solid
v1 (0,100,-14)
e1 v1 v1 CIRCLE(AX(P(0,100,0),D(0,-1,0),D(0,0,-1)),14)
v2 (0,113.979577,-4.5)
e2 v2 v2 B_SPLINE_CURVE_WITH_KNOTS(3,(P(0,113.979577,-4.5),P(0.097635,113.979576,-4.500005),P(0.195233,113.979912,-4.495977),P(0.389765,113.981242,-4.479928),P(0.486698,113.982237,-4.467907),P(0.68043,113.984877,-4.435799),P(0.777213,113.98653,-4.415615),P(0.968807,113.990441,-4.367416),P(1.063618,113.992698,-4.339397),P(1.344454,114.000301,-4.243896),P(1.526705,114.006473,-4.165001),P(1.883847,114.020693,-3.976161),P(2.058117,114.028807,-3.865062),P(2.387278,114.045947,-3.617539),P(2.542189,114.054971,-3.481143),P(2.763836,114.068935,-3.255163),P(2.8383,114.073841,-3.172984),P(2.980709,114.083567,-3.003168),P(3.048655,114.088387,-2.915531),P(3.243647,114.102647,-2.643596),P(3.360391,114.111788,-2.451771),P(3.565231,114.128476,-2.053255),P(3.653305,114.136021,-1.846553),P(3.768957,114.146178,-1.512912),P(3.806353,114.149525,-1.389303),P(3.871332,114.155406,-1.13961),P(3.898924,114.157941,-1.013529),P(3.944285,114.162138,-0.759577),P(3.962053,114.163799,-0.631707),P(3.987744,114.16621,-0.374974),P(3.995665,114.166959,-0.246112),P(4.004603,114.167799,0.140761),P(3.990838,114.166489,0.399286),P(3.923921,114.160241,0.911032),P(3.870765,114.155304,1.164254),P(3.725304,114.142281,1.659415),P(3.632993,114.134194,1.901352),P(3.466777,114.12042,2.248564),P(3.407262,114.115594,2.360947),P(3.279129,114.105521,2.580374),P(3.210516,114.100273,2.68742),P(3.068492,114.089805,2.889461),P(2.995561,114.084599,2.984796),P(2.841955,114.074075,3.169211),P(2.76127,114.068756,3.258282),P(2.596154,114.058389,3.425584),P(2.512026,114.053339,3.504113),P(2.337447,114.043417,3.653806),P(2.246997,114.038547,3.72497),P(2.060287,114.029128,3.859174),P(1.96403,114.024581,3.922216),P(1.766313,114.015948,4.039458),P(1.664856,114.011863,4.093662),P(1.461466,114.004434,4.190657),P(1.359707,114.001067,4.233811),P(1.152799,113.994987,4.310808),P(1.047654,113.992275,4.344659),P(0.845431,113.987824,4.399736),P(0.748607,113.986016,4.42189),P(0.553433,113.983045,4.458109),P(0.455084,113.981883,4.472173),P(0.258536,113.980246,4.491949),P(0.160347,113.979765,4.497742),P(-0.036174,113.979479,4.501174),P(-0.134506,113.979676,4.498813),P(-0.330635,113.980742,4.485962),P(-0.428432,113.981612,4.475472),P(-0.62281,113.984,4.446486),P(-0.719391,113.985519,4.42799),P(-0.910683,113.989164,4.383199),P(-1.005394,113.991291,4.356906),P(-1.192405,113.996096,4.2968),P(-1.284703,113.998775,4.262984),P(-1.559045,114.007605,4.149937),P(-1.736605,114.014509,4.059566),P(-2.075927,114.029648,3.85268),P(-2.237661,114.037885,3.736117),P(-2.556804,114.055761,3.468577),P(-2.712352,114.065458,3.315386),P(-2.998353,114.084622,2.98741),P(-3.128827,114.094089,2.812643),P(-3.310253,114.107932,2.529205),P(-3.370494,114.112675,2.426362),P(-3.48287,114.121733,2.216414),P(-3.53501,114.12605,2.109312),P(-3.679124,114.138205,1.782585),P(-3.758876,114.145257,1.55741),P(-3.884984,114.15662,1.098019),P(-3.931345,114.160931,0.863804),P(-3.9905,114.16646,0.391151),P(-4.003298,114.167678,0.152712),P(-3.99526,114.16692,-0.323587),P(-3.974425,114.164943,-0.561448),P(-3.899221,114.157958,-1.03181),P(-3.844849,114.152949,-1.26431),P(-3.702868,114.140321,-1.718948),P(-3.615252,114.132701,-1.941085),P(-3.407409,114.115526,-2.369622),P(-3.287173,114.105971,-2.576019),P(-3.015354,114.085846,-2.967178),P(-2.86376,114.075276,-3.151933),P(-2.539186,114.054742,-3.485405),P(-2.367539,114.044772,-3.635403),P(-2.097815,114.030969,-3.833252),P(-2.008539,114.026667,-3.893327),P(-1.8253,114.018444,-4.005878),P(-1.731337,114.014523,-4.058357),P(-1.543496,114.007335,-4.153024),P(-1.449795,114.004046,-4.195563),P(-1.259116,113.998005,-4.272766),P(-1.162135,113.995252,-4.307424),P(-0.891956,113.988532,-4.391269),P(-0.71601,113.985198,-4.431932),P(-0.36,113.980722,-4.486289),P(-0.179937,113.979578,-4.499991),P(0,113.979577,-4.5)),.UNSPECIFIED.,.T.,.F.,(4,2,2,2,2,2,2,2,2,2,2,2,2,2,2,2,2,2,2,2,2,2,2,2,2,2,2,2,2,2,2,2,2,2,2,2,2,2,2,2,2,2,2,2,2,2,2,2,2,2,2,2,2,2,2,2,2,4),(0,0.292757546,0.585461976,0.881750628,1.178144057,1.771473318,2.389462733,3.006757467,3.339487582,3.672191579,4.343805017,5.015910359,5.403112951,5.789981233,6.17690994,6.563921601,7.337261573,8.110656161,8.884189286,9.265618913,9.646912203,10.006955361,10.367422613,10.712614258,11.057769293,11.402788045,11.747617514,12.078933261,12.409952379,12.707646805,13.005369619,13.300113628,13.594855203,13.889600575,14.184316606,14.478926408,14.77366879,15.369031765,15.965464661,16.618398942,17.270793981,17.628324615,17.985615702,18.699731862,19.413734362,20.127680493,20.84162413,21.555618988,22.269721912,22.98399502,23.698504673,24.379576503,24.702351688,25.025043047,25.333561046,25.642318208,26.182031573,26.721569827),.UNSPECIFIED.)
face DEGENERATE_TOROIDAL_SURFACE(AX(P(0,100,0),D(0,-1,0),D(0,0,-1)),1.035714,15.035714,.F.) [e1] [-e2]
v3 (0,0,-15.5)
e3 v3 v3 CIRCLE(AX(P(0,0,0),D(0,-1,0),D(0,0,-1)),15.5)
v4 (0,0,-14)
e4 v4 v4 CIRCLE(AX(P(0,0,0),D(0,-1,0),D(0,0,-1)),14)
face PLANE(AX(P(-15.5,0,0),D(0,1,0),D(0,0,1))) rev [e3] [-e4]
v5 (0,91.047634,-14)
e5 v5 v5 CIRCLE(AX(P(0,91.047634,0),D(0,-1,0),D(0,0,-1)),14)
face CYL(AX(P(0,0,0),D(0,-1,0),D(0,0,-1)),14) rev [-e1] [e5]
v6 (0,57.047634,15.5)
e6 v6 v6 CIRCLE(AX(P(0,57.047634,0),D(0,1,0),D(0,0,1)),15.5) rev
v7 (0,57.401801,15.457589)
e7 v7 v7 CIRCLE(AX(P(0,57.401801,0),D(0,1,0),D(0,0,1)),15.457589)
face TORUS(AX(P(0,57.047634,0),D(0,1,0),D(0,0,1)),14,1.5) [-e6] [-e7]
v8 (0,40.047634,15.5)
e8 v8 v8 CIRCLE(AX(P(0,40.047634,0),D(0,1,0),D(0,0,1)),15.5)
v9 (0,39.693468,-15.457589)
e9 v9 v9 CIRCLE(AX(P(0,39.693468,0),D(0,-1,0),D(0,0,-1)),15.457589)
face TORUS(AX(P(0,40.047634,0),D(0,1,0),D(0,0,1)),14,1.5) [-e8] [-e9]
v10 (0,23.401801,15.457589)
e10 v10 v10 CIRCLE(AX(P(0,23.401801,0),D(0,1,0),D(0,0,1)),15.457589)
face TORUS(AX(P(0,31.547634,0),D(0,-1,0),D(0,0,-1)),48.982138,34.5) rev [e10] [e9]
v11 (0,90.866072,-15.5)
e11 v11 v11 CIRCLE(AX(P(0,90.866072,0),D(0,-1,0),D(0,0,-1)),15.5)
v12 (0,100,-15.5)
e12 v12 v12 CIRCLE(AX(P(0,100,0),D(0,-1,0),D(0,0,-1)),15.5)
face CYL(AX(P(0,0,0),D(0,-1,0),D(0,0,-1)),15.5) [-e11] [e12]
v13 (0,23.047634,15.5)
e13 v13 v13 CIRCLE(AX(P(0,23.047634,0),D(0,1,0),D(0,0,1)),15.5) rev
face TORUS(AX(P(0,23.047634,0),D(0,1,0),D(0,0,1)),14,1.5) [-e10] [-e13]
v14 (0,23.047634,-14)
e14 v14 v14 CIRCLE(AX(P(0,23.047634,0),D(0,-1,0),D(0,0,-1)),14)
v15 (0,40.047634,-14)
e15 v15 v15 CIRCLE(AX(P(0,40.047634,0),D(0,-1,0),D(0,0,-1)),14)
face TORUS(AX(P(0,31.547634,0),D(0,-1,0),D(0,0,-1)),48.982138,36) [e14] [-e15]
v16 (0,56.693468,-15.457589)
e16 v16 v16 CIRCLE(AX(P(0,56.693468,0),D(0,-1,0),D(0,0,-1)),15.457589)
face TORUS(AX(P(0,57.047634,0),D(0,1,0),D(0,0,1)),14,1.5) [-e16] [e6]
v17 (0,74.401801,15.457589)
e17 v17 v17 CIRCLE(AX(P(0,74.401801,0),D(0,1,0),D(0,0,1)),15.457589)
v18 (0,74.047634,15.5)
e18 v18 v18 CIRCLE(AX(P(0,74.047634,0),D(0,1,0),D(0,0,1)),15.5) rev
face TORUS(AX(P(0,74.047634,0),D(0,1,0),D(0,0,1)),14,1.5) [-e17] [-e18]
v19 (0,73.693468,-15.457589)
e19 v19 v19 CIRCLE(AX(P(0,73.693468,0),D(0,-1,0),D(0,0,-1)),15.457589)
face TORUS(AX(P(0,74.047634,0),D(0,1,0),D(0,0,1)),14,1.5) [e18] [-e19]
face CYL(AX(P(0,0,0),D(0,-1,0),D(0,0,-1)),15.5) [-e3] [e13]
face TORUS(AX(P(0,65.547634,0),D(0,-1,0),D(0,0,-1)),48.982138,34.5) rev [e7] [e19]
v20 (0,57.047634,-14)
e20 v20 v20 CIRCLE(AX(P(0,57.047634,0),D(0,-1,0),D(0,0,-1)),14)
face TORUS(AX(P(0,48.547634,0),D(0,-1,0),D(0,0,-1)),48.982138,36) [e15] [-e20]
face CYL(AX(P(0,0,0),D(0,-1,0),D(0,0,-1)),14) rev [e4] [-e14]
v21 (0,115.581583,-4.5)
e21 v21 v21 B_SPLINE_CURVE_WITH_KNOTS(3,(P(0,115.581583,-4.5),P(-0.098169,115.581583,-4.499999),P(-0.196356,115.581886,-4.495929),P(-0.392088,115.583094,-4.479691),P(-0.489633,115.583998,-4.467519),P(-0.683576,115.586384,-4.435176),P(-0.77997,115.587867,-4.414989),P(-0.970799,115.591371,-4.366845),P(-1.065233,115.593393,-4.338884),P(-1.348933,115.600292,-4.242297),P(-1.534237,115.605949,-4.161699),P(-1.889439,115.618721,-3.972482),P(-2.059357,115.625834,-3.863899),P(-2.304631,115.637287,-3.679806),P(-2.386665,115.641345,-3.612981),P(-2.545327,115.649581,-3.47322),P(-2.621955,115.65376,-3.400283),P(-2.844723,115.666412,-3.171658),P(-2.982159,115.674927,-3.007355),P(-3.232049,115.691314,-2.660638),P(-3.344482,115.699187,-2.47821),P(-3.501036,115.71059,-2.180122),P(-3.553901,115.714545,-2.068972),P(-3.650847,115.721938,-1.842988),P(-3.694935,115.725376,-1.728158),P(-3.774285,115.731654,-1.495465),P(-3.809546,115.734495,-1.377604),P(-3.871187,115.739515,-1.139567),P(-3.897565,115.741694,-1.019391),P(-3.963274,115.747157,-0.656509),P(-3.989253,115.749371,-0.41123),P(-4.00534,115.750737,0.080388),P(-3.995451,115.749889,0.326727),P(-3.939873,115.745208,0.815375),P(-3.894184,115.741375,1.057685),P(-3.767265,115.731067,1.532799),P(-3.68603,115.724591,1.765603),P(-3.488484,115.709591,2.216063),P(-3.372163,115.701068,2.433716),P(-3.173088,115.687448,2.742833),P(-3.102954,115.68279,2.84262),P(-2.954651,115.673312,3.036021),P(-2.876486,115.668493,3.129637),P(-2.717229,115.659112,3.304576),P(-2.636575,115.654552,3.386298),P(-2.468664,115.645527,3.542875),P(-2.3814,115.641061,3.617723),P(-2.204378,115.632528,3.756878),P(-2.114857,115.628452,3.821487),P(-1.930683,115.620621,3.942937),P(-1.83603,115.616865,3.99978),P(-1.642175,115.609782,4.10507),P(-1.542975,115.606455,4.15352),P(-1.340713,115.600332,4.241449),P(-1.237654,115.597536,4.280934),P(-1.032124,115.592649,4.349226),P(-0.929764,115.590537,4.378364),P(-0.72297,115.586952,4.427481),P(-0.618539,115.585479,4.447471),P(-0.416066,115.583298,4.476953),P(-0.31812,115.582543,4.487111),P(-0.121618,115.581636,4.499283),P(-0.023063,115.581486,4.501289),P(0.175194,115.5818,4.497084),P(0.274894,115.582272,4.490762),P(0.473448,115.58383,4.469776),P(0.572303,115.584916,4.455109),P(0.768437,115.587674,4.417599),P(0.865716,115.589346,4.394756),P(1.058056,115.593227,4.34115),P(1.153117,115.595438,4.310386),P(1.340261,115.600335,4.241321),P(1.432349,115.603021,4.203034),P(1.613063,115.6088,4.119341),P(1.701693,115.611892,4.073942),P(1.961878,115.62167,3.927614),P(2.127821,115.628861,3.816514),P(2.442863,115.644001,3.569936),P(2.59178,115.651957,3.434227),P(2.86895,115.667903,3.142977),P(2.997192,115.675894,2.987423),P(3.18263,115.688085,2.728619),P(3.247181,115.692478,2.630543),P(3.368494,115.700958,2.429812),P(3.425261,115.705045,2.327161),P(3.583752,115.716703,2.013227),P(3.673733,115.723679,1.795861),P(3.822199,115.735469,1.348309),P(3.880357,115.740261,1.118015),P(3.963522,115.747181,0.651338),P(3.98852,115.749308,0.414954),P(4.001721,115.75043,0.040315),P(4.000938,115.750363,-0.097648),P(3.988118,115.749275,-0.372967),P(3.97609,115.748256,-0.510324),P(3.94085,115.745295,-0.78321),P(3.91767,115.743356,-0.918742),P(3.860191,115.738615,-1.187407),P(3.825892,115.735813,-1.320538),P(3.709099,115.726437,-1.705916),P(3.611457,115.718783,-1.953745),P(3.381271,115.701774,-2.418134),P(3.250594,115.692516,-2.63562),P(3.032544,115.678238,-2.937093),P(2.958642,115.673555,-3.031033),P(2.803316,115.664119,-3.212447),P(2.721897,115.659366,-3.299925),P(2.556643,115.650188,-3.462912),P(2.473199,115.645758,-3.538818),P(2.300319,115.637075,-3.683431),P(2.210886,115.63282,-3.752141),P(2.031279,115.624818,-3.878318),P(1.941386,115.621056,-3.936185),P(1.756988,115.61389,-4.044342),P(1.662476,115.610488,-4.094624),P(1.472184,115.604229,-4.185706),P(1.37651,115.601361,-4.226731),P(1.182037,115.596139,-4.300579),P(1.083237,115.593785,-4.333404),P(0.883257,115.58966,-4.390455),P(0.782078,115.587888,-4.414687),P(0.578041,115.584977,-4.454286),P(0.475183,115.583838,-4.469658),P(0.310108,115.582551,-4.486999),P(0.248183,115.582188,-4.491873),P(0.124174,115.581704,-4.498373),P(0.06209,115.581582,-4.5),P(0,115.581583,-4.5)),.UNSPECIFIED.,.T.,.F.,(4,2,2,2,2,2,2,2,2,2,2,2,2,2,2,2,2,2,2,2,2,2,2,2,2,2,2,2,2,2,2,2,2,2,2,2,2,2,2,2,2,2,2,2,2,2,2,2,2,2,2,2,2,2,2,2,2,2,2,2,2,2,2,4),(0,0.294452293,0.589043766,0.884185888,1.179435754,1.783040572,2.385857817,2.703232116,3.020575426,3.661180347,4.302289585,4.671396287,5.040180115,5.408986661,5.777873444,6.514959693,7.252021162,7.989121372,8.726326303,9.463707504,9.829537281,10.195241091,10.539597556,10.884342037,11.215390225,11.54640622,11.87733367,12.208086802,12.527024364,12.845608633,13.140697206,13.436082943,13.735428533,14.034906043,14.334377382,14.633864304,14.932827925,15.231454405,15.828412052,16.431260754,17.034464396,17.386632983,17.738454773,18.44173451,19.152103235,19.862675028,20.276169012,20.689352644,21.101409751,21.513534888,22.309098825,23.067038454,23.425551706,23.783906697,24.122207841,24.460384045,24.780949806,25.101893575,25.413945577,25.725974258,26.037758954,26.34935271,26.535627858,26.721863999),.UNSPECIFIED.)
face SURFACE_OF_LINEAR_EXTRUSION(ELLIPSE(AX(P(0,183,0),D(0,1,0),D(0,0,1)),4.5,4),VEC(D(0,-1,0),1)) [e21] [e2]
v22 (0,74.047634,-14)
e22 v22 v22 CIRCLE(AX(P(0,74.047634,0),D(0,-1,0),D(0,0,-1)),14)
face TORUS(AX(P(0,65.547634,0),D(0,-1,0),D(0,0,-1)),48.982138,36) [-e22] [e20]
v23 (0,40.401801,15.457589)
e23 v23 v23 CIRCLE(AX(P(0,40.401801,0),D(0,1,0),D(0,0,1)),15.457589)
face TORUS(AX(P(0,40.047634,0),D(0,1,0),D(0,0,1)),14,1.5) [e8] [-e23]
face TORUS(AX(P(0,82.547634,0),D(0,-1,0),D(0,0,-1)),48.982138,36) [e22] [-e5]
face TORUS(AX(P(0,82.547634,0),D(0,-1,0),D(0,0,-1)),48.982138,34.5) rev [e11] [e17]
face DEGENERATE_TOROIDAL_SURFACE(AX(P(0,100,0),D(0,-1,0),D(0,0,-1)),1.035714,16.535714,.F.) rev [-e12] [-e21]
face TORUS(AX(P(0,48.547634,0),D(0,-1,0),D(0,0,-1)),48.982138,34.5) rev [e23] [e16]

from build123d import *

# Parameters (mm, degrees)
CORTAR_EXTRUIR6_START = 40
CROQUIS3_RX           = 4.5
CROQUIS3_RY           = 4
CORTAR_EXTRUIR6_DEPTH = 143
REDONDEO5_R           = 1.5


with BuildPart() as part:
    # Croquis2 → Revolución2 (revolve)
    with BuildSketch(Plane.XY, mode=Mode.PRIVATE) as revoluci_n2_sk:
        with BuildLine():
            Line((-15.5, 100), (-15.5, 90.866072441))
            ThreePointArc((-15.5, 90.866072441), (-14.482138299, 82.547634192), (-15.5, 74.229195944))
            Line((-15.5, 74.229195944), (-15.5, 73.866072441))
            ThreePointArc((-15.5, 73.866072441), (-14.482138299, 65.547634192), (-15.5, 57.229195944))
            Line((-15.5, 57.229195944), (-15.5, 56.866072441))
            ThreePointArc((-15.5, 56.866072441), (-14.482138299, 48.547634192), (-15.5, 40.229195944))
            Line((-15.5, 40.229195944), (-15.5, 39.866072441))
            ThreePointArc((-15.5, 39.866072441), (-14.482138299, 31.547634192), (-15.5, 23.229195944))
            Line((-15.5, 23.229195944), (-15.5, 0))
            Line((-15.5, 0), (-14, 0))
            Line((-14, 0), (-14, 23.047634192))
            ThreePointArc((-14, 23.047634192), (-12.982138299, 31.547634192), (-14, 40.047634192))
            ThreePointArc((-14, 40.047634192), (-12.982138299, 48.547634192), (-14, 57.047634192))
            ThreePointArc((-14, 57.047634192), (-12.982138299, 65.547634192), (-14, 74.047634192))
            ThreePointArc((-14, 74.047634192), (-12.982138299, 82.547634192), (-14, 91.047634192))
            Line((-14, 91.047634192), (-14, 100))
            ThreePointArc((-14, 100), (-9.956223855, 110.259142264), (0, 115))
            Line((0, 115), (0, 116.496437055))
            Line((0, 116.496437055), (-0.103325416, 116.496437055))
            ThreePointArc((-0.103325416, 116.496437055), (-11.052806757, 111.28261964), (-15.5, 100))
        make_face()
    revolve(revoluci_n2_sk.sketch.rotate(Axis((0, 0, 0), (0, 1, 0)), 270), axis=Axis((0, 0, 0), (0, 1, 0)))

    # Croquis3 → Cortar-Extruir6 (cut)
    with BuildSketch(Plane(origin=(0, 0, 0), x_dir=(1, 0, 0), z_dir=(0, 1, 0)).offset(CORTAR_EXTRUIR6_START)):
        with Locations(Location((0, 0), (0, 0, -90))):
            Ellipse(CROQUIS3_RX, CROQUIS3_RY)
    extrude(amount=CORTAR_EXTRUIR6_DEPTH, mode=Mode.SUBTRACT)

    # Redondeo5
    redondeo5_edges = [part.edges().sort_by_distance(p)[0] for p in [
        (0, 74.229195944, 15.5),
        (0, 73.866072441, 15.5),
        (0, 57.229195944, 15.5),
        (0, 56.866072441, 15.5),
        (0, 40.229195944, 15.5),
        (0, 39.866072441, 15.5),
        (0, 23.229195944, 15.5),
    ]]
    fillet(redondeo5_edges, radius=REDONDEO5_R - 0.0001)  # a hair under: the kernel refuses the full size


solid = part.part
